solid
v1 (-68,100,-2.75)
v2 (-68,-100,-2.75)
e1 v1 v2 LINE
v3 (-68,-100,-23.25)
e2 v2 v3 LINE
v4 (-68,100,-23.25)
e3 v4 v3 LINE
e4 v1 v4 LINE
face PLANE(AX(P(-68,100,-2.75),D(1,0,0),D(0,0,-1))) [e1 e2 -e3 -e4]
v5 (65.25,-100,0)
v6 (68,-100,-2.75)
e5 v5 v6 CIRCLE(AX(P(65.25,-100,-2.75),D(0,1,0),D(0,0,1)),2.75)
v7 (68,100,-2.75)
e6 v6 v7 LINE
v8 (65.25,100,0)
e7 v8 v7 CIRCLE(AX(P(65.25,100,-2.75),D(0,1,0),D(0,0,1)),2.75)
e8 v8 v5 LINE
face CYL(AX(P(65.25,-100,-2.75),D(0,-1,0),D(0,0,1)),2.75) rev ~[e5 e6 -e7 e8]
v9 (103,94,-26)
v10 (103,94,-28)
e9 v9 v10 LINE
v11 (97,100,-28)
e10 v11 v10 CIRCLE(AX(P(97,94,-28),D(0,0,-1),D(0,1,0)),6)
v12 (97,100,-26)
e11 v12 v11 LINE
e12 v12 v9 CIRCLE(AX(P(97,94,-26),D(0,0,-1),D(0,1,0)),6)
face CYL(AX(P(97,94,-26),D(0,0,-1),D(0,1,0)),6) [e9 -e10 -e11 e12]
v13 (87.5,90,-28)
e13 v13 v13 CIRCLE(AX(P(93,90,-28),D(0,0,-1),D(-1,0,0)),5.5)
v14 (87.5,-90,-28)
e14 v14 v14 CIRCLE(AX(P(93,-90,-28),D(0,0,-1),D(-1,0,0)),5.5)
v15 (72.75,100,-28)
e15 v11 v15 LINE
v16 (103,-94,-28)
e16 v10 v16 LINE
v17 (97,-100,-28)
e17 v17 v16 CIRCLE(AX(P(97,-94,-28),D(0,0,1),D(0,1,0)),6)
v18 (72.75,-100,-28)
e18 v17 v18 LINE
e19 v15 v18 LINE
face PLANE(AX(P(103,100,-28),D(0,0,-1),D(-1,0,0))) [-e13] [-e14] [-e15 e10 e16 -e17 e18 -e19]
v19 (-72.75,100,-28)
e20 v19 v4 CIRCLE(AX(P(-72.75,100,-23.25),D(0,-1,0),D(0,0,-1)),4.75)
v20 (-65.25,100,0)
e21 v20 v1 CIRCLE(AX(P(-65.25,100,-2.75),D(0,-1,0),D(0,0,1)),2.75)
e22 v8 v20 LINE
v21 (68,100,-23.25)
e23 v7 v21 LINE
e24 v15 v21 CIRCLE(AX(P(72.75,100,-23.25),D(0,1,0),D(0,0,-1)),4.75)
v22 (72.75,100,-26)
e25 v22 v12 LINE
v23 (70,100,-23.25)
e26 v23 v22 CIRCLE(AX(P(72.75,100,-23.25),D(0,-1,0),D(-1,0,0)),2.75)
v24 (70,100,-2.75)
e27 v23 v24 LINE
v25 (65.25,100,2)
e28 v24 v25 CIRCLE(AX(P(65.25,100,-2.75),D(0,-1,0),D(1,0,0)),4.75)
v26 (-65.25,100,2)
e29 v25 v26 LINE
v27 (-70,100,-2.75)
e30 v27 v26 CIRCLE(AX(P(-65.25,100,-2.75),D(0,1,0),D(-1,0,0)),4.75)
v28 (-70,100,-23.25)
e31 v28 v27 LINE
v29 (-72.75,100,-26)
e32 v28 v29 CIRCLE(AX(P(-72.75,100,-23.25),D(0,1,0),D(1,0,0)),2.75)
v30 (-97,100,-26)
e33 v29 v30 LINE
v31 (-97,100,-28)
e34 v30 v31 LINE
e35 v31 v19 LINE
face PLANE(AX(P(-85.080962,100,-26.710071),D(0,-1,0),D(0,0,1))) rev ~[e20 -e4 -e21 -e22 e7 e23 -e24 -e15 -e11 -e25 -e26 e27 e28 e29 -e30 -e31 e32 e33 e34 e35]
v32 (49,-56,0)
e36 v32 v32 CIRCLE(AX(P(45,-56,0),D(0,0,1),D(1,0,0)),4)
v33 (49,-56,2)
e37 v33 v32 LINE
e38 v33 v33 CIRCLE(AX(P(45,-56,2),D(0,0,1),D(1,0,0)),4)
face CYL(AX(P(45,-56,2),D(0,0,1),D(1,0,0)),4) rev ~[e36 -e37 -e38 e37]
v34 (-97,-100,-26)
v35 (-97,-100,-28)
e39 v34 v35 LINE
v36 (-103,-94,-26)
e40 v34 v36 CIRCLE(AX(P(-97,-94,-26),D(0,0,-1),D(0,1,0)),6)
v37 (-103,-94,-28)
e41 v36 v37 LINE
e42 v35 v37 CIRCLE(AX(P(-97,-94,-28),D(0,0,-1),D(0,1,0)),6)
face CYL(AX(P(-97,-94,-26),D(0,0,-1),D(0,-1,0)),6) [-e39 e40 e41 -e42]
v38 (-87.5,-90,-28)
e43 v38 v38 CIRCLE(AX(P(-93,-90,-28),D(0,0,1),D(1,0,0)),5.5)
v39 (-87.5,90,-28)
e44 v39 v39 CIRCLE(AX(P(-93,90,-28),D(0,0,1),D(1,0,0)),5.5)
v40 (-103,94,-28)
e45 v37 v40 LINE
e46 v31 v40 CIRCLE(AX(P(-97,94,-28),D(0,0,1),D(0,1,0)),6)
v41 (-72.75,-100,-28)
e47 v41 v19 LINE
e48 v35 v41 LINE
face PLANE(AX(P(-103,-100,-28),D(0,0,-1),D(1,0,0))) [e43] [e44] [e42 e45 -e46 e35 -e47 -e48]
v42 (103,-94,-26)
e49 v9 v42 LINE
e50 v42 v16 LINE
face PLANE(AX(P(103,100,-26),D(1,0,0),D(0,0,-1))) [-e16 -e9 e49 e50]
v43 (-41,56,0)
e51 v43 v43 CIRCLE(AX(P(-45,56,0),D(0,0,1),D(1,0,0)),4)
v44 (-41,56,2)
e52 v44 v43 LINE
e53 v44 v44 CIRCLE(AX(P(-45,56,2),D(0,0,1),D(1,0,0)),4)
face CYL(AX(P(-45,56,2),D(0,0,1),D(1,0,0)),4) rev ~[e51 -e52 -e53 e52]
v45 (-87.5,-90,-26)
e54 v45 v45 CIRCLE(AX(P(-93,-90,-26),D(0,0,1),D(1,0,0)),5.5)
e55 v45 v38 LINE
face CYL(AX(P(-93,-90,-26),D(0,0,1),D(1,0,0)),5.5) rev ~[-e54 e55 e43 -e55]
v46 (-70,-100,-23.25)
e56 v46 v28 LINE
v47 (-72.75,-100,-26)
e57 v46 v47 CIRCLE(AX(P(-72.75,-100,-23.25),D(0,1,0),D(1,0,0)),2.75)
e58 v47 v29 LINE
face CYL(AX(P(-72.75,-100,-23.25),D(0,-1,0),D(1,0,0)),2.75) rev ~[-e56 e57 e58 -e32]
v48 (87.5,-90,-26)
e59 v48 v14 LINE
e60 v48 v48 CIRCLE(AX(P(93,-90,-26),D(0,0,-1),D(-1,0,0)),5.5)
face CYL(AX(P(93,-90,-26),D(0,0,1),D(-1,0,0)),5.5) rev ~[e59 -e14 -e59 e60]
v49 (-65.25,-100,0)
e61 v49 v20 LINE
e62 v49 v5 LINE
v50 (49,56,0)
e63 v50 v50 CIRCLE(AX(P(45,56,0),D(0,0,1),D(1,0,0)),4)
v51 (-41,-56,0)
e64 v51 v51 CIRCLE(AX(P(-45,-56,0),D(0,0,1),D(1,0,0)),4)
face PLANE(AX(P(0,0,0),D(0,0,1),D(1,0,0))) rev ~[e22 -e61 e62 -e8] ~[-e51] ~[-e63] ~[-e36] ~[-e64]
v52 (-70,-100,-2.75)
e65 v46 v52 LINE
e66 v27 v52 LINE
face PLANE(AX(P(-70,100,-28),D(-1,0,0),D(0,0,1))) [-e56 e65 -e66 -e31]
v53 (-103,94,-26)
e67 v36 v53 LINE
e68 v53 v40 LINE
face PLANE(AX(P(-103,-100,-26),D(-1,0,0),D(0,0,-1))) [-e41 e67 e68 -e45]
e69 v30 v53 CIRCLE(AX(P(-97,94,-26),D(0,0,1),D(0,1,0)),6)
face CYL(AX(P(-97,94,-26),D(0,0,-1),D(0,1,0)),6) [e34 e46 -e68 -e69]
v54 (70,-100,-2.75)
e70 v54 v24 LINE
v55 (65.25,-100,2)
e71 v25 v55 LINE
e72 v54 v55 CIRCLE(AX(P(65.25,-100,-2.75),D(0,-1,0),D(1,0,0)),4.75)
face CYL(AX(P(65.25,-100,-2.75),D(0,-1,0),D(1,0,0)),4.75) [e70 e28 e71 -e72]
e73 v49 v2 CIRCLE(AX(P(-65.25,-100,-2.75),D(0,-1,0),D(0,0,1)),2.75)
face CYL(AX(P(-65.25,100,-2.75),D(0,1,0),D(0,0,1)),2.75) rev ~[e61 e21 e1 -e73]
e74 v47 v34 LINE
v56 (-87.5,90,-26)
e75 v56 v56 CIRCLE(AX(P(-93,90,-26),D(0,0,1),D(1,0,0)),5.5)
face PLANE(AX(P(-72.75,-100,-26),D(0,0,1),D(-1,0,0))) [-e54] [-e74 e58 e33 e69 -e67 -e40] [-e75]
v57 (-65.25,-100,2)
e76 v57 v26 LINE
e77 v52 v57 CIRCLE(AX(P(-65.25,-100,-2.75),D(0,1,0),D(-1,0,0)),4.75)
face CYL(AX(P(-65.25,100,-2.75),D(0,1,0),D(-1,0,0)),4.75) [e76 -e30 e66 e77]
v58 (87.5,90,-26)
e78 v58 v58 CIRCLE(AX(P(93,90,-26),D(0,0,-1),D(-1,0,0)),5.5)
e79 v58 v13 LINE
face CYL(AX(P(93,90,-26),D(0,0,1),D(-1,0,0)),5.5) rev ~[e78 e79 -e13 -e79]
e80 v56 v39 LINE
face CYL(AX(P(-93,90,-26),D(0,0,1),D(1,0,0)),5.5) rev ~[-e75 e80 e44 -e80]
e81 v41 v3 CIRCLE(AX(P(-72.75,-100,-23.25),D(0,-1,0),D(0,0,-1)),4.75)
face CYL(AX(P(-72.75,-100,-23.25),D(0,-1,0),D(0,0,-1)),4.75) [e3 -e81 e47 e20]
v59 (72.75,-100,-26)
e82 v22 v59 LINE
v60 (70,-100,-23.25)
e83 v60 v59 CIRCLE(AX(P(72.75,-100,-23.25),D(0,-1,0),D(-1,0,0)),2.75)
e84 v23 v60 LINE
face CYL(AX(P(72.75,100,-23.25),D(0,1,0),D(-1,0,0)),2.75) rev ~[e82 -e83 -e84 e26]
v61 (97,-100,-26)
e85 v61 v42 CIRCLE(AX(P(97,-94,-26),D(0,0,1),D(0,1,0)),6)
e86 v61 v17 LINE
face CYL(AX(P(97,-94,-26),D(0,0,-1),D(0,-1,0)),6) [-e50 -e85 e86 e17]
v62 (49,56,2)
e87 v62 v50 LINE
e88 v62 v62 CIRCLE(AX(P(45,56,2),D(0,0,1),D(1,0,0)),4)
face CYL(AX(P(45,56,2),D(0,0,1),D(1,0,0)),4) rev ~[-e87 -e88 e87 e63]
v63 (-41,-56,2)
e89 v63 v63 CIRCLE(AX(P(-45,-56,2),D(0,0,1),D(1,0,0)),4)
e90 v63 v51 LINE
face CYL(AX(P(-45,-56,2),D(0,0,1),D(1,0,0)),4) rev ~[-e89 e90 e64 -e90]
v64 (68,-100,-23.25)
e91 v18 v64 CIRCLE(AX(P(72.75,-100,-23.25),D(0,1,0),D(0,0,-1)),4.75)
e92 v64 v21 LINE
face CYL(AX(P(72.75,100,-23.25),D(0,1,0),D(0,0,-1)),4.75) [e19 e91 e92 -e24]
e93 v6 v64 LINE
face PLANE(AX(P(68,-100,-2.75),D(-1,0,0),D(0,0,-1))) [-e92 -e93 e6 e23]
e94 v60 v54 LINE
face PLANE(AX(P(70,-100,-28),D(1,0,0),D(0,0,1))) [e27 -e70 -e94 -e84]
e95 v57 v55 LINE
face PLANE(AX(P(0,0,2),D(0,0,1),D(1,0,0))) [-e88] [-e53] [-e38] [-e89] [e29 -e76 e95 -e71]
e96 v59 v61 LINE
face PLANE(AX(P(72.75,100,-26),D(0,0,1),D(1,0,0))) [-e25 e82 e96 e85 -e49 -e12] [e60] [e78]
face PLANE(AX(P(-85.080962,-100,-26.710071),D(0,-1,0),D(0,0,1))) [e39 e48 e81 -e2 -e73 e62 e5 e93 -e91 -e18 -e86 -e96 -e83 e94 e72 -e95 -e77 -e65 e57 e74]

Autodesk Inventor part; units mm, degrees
ref_plane "YZ Plane" through (0, 0, 0) normal (1, 0, 0) x (0, 1, 0)
ref_plane "XZ Plane" through (0, 0, 0) normal (0, 1, 0) x (-1, 0, 0)
ref_plane "XY Plane" through (0, 0, 0) normal (0, 0, 1) x (1, 0, 0)
sketch "Sketch1" plane through (0, 0, 0) normal (0, 0, 1) x (1, 0, 0)
  line L0 (-70, -100) -> (70, -100)
  line L1 (70, -100) -> (70, 100)
  line L2 (70, 100) -> (-70, 100)
  line L3 (-70, 100) -> (-70, -100)
  line L4 (-70, -100) -> (70, 100) construction
  line L5 (70, -100) -> (-70, 100) construction
  point P0 (0, 0)
  dimension "d154" = 140
  dimension "d155" = 200
extrude "Plate5" add sketch "Sketch1" along normal blind 2
sketch "Sketch7" plane through (68, -100, 2) normal (1, 0, 0) x (0, 1, 0)
  line L0 (200, 0) -> (0, 0)
  line L1 (0, 0) -> (0, -30)
  line L2 (0, -30) -> (200, -30)
  line L3 (200, -30) -> (200, 0)
edge flange "Flange3" height 30 angle 90 thickness 2 bend radius 2.75 thickness toward (1, 0, 0) relief round relief width 2 relief depth 1 corner gap 2.75 corner form 0 edges at (70, 0, 0) (-70, 0, 0) wall of the first edge with corners at (68, 100, 2) (68, -100, 2) (68, -100, -28) (68, 100, -28)
bend "Bend3"
corner "Corner3"
sketch "Sketch8" plane through (-68, -100, -26) normal (0, 0, -1) x (-1, 0, 0)
  line L0 (0, 200) -> (0, 0)
  line L1 (0, 0) -> (35, 0)
  line L2 (35, 0) -> (35, 200)
  line L3 (35, 200) -> (0, 200)
edge flange "Flange4" height 35 angle 90 thickness 2 bend radius 2.75 thickness toward (0, 0, -1) relief round relief width 2 relief depth 1 corner gap 2.75 corner form 0 edges at (-70, 0, -28) (70, 0, -28) wall of the first edge with corners at (-68, 100, -26) (-68, -100, -26) (-103, -100, -26) (-103, 100, -26)
bend "Bend4"
corner "Corner4"
sketch "Sketch9" plane through (-103, -100, -26) normal (0, 0, 1) x (1, 0, 0)
  line L0 (30.25, 0) -> (30.25, 200) projected
  line L1 (30.25, 200) -> (0, 200) projected
  line L2 (0, 200) -> (0, 0) projected
  line L3 (30.25, 0) -> (0, 0) projected
  circle A0 centre (10, 190) radius 5.5
  circle A1 centre (10, 10) radius 5.5
  point P0 (103, 100)
  dimension "d177" = 11
  dimension "d178" = 10
  dimension "d179" = 10
  dimension "d180" = 10
extrude "Cut1" cut sketch "Sketch9" against normal blind 2 contours A0 | A1
mirror "Mirror1" about plane through (0, 0, 0) normal (1, 0, 0) of "Cut1"
fillet "Corner Round2" radius 6 4 edges at (-103, 100, -27) (-103, -100, -27) (103, 100, -27) (103, -100, -27)
sketch "Sketch10" plane through (0, 0, 2) normal (0, 0, 1) x (1, 0, 0)
  circle A0 centre (-45, 56) radius 4
  line L0 (-45, 56) -> (45, 56) construction
  line L1 (45, 56) -> (45, -56) construction
  line L2 (45, -56) -> (-45, -56) construction
  line L3 (-45, -56) -> (-45, 56) construction
  circle A1 centre (45, 56) radius 4
  circle A2 centre (45, -56) radius 4
  circle A3 centre (-45, -56) radius 4
  point P0 (0, 0)
  point P1 (0, 56)
  point P2 (45, 0)
  dimension "d185" = 8
  dimension "d186" = 90
  dimension "d187" = 112
extrude "Cut2" cut sketch "Sketch10" against normal blind 2
properties part number "TKS mixer support" material "Stainless Steel"
